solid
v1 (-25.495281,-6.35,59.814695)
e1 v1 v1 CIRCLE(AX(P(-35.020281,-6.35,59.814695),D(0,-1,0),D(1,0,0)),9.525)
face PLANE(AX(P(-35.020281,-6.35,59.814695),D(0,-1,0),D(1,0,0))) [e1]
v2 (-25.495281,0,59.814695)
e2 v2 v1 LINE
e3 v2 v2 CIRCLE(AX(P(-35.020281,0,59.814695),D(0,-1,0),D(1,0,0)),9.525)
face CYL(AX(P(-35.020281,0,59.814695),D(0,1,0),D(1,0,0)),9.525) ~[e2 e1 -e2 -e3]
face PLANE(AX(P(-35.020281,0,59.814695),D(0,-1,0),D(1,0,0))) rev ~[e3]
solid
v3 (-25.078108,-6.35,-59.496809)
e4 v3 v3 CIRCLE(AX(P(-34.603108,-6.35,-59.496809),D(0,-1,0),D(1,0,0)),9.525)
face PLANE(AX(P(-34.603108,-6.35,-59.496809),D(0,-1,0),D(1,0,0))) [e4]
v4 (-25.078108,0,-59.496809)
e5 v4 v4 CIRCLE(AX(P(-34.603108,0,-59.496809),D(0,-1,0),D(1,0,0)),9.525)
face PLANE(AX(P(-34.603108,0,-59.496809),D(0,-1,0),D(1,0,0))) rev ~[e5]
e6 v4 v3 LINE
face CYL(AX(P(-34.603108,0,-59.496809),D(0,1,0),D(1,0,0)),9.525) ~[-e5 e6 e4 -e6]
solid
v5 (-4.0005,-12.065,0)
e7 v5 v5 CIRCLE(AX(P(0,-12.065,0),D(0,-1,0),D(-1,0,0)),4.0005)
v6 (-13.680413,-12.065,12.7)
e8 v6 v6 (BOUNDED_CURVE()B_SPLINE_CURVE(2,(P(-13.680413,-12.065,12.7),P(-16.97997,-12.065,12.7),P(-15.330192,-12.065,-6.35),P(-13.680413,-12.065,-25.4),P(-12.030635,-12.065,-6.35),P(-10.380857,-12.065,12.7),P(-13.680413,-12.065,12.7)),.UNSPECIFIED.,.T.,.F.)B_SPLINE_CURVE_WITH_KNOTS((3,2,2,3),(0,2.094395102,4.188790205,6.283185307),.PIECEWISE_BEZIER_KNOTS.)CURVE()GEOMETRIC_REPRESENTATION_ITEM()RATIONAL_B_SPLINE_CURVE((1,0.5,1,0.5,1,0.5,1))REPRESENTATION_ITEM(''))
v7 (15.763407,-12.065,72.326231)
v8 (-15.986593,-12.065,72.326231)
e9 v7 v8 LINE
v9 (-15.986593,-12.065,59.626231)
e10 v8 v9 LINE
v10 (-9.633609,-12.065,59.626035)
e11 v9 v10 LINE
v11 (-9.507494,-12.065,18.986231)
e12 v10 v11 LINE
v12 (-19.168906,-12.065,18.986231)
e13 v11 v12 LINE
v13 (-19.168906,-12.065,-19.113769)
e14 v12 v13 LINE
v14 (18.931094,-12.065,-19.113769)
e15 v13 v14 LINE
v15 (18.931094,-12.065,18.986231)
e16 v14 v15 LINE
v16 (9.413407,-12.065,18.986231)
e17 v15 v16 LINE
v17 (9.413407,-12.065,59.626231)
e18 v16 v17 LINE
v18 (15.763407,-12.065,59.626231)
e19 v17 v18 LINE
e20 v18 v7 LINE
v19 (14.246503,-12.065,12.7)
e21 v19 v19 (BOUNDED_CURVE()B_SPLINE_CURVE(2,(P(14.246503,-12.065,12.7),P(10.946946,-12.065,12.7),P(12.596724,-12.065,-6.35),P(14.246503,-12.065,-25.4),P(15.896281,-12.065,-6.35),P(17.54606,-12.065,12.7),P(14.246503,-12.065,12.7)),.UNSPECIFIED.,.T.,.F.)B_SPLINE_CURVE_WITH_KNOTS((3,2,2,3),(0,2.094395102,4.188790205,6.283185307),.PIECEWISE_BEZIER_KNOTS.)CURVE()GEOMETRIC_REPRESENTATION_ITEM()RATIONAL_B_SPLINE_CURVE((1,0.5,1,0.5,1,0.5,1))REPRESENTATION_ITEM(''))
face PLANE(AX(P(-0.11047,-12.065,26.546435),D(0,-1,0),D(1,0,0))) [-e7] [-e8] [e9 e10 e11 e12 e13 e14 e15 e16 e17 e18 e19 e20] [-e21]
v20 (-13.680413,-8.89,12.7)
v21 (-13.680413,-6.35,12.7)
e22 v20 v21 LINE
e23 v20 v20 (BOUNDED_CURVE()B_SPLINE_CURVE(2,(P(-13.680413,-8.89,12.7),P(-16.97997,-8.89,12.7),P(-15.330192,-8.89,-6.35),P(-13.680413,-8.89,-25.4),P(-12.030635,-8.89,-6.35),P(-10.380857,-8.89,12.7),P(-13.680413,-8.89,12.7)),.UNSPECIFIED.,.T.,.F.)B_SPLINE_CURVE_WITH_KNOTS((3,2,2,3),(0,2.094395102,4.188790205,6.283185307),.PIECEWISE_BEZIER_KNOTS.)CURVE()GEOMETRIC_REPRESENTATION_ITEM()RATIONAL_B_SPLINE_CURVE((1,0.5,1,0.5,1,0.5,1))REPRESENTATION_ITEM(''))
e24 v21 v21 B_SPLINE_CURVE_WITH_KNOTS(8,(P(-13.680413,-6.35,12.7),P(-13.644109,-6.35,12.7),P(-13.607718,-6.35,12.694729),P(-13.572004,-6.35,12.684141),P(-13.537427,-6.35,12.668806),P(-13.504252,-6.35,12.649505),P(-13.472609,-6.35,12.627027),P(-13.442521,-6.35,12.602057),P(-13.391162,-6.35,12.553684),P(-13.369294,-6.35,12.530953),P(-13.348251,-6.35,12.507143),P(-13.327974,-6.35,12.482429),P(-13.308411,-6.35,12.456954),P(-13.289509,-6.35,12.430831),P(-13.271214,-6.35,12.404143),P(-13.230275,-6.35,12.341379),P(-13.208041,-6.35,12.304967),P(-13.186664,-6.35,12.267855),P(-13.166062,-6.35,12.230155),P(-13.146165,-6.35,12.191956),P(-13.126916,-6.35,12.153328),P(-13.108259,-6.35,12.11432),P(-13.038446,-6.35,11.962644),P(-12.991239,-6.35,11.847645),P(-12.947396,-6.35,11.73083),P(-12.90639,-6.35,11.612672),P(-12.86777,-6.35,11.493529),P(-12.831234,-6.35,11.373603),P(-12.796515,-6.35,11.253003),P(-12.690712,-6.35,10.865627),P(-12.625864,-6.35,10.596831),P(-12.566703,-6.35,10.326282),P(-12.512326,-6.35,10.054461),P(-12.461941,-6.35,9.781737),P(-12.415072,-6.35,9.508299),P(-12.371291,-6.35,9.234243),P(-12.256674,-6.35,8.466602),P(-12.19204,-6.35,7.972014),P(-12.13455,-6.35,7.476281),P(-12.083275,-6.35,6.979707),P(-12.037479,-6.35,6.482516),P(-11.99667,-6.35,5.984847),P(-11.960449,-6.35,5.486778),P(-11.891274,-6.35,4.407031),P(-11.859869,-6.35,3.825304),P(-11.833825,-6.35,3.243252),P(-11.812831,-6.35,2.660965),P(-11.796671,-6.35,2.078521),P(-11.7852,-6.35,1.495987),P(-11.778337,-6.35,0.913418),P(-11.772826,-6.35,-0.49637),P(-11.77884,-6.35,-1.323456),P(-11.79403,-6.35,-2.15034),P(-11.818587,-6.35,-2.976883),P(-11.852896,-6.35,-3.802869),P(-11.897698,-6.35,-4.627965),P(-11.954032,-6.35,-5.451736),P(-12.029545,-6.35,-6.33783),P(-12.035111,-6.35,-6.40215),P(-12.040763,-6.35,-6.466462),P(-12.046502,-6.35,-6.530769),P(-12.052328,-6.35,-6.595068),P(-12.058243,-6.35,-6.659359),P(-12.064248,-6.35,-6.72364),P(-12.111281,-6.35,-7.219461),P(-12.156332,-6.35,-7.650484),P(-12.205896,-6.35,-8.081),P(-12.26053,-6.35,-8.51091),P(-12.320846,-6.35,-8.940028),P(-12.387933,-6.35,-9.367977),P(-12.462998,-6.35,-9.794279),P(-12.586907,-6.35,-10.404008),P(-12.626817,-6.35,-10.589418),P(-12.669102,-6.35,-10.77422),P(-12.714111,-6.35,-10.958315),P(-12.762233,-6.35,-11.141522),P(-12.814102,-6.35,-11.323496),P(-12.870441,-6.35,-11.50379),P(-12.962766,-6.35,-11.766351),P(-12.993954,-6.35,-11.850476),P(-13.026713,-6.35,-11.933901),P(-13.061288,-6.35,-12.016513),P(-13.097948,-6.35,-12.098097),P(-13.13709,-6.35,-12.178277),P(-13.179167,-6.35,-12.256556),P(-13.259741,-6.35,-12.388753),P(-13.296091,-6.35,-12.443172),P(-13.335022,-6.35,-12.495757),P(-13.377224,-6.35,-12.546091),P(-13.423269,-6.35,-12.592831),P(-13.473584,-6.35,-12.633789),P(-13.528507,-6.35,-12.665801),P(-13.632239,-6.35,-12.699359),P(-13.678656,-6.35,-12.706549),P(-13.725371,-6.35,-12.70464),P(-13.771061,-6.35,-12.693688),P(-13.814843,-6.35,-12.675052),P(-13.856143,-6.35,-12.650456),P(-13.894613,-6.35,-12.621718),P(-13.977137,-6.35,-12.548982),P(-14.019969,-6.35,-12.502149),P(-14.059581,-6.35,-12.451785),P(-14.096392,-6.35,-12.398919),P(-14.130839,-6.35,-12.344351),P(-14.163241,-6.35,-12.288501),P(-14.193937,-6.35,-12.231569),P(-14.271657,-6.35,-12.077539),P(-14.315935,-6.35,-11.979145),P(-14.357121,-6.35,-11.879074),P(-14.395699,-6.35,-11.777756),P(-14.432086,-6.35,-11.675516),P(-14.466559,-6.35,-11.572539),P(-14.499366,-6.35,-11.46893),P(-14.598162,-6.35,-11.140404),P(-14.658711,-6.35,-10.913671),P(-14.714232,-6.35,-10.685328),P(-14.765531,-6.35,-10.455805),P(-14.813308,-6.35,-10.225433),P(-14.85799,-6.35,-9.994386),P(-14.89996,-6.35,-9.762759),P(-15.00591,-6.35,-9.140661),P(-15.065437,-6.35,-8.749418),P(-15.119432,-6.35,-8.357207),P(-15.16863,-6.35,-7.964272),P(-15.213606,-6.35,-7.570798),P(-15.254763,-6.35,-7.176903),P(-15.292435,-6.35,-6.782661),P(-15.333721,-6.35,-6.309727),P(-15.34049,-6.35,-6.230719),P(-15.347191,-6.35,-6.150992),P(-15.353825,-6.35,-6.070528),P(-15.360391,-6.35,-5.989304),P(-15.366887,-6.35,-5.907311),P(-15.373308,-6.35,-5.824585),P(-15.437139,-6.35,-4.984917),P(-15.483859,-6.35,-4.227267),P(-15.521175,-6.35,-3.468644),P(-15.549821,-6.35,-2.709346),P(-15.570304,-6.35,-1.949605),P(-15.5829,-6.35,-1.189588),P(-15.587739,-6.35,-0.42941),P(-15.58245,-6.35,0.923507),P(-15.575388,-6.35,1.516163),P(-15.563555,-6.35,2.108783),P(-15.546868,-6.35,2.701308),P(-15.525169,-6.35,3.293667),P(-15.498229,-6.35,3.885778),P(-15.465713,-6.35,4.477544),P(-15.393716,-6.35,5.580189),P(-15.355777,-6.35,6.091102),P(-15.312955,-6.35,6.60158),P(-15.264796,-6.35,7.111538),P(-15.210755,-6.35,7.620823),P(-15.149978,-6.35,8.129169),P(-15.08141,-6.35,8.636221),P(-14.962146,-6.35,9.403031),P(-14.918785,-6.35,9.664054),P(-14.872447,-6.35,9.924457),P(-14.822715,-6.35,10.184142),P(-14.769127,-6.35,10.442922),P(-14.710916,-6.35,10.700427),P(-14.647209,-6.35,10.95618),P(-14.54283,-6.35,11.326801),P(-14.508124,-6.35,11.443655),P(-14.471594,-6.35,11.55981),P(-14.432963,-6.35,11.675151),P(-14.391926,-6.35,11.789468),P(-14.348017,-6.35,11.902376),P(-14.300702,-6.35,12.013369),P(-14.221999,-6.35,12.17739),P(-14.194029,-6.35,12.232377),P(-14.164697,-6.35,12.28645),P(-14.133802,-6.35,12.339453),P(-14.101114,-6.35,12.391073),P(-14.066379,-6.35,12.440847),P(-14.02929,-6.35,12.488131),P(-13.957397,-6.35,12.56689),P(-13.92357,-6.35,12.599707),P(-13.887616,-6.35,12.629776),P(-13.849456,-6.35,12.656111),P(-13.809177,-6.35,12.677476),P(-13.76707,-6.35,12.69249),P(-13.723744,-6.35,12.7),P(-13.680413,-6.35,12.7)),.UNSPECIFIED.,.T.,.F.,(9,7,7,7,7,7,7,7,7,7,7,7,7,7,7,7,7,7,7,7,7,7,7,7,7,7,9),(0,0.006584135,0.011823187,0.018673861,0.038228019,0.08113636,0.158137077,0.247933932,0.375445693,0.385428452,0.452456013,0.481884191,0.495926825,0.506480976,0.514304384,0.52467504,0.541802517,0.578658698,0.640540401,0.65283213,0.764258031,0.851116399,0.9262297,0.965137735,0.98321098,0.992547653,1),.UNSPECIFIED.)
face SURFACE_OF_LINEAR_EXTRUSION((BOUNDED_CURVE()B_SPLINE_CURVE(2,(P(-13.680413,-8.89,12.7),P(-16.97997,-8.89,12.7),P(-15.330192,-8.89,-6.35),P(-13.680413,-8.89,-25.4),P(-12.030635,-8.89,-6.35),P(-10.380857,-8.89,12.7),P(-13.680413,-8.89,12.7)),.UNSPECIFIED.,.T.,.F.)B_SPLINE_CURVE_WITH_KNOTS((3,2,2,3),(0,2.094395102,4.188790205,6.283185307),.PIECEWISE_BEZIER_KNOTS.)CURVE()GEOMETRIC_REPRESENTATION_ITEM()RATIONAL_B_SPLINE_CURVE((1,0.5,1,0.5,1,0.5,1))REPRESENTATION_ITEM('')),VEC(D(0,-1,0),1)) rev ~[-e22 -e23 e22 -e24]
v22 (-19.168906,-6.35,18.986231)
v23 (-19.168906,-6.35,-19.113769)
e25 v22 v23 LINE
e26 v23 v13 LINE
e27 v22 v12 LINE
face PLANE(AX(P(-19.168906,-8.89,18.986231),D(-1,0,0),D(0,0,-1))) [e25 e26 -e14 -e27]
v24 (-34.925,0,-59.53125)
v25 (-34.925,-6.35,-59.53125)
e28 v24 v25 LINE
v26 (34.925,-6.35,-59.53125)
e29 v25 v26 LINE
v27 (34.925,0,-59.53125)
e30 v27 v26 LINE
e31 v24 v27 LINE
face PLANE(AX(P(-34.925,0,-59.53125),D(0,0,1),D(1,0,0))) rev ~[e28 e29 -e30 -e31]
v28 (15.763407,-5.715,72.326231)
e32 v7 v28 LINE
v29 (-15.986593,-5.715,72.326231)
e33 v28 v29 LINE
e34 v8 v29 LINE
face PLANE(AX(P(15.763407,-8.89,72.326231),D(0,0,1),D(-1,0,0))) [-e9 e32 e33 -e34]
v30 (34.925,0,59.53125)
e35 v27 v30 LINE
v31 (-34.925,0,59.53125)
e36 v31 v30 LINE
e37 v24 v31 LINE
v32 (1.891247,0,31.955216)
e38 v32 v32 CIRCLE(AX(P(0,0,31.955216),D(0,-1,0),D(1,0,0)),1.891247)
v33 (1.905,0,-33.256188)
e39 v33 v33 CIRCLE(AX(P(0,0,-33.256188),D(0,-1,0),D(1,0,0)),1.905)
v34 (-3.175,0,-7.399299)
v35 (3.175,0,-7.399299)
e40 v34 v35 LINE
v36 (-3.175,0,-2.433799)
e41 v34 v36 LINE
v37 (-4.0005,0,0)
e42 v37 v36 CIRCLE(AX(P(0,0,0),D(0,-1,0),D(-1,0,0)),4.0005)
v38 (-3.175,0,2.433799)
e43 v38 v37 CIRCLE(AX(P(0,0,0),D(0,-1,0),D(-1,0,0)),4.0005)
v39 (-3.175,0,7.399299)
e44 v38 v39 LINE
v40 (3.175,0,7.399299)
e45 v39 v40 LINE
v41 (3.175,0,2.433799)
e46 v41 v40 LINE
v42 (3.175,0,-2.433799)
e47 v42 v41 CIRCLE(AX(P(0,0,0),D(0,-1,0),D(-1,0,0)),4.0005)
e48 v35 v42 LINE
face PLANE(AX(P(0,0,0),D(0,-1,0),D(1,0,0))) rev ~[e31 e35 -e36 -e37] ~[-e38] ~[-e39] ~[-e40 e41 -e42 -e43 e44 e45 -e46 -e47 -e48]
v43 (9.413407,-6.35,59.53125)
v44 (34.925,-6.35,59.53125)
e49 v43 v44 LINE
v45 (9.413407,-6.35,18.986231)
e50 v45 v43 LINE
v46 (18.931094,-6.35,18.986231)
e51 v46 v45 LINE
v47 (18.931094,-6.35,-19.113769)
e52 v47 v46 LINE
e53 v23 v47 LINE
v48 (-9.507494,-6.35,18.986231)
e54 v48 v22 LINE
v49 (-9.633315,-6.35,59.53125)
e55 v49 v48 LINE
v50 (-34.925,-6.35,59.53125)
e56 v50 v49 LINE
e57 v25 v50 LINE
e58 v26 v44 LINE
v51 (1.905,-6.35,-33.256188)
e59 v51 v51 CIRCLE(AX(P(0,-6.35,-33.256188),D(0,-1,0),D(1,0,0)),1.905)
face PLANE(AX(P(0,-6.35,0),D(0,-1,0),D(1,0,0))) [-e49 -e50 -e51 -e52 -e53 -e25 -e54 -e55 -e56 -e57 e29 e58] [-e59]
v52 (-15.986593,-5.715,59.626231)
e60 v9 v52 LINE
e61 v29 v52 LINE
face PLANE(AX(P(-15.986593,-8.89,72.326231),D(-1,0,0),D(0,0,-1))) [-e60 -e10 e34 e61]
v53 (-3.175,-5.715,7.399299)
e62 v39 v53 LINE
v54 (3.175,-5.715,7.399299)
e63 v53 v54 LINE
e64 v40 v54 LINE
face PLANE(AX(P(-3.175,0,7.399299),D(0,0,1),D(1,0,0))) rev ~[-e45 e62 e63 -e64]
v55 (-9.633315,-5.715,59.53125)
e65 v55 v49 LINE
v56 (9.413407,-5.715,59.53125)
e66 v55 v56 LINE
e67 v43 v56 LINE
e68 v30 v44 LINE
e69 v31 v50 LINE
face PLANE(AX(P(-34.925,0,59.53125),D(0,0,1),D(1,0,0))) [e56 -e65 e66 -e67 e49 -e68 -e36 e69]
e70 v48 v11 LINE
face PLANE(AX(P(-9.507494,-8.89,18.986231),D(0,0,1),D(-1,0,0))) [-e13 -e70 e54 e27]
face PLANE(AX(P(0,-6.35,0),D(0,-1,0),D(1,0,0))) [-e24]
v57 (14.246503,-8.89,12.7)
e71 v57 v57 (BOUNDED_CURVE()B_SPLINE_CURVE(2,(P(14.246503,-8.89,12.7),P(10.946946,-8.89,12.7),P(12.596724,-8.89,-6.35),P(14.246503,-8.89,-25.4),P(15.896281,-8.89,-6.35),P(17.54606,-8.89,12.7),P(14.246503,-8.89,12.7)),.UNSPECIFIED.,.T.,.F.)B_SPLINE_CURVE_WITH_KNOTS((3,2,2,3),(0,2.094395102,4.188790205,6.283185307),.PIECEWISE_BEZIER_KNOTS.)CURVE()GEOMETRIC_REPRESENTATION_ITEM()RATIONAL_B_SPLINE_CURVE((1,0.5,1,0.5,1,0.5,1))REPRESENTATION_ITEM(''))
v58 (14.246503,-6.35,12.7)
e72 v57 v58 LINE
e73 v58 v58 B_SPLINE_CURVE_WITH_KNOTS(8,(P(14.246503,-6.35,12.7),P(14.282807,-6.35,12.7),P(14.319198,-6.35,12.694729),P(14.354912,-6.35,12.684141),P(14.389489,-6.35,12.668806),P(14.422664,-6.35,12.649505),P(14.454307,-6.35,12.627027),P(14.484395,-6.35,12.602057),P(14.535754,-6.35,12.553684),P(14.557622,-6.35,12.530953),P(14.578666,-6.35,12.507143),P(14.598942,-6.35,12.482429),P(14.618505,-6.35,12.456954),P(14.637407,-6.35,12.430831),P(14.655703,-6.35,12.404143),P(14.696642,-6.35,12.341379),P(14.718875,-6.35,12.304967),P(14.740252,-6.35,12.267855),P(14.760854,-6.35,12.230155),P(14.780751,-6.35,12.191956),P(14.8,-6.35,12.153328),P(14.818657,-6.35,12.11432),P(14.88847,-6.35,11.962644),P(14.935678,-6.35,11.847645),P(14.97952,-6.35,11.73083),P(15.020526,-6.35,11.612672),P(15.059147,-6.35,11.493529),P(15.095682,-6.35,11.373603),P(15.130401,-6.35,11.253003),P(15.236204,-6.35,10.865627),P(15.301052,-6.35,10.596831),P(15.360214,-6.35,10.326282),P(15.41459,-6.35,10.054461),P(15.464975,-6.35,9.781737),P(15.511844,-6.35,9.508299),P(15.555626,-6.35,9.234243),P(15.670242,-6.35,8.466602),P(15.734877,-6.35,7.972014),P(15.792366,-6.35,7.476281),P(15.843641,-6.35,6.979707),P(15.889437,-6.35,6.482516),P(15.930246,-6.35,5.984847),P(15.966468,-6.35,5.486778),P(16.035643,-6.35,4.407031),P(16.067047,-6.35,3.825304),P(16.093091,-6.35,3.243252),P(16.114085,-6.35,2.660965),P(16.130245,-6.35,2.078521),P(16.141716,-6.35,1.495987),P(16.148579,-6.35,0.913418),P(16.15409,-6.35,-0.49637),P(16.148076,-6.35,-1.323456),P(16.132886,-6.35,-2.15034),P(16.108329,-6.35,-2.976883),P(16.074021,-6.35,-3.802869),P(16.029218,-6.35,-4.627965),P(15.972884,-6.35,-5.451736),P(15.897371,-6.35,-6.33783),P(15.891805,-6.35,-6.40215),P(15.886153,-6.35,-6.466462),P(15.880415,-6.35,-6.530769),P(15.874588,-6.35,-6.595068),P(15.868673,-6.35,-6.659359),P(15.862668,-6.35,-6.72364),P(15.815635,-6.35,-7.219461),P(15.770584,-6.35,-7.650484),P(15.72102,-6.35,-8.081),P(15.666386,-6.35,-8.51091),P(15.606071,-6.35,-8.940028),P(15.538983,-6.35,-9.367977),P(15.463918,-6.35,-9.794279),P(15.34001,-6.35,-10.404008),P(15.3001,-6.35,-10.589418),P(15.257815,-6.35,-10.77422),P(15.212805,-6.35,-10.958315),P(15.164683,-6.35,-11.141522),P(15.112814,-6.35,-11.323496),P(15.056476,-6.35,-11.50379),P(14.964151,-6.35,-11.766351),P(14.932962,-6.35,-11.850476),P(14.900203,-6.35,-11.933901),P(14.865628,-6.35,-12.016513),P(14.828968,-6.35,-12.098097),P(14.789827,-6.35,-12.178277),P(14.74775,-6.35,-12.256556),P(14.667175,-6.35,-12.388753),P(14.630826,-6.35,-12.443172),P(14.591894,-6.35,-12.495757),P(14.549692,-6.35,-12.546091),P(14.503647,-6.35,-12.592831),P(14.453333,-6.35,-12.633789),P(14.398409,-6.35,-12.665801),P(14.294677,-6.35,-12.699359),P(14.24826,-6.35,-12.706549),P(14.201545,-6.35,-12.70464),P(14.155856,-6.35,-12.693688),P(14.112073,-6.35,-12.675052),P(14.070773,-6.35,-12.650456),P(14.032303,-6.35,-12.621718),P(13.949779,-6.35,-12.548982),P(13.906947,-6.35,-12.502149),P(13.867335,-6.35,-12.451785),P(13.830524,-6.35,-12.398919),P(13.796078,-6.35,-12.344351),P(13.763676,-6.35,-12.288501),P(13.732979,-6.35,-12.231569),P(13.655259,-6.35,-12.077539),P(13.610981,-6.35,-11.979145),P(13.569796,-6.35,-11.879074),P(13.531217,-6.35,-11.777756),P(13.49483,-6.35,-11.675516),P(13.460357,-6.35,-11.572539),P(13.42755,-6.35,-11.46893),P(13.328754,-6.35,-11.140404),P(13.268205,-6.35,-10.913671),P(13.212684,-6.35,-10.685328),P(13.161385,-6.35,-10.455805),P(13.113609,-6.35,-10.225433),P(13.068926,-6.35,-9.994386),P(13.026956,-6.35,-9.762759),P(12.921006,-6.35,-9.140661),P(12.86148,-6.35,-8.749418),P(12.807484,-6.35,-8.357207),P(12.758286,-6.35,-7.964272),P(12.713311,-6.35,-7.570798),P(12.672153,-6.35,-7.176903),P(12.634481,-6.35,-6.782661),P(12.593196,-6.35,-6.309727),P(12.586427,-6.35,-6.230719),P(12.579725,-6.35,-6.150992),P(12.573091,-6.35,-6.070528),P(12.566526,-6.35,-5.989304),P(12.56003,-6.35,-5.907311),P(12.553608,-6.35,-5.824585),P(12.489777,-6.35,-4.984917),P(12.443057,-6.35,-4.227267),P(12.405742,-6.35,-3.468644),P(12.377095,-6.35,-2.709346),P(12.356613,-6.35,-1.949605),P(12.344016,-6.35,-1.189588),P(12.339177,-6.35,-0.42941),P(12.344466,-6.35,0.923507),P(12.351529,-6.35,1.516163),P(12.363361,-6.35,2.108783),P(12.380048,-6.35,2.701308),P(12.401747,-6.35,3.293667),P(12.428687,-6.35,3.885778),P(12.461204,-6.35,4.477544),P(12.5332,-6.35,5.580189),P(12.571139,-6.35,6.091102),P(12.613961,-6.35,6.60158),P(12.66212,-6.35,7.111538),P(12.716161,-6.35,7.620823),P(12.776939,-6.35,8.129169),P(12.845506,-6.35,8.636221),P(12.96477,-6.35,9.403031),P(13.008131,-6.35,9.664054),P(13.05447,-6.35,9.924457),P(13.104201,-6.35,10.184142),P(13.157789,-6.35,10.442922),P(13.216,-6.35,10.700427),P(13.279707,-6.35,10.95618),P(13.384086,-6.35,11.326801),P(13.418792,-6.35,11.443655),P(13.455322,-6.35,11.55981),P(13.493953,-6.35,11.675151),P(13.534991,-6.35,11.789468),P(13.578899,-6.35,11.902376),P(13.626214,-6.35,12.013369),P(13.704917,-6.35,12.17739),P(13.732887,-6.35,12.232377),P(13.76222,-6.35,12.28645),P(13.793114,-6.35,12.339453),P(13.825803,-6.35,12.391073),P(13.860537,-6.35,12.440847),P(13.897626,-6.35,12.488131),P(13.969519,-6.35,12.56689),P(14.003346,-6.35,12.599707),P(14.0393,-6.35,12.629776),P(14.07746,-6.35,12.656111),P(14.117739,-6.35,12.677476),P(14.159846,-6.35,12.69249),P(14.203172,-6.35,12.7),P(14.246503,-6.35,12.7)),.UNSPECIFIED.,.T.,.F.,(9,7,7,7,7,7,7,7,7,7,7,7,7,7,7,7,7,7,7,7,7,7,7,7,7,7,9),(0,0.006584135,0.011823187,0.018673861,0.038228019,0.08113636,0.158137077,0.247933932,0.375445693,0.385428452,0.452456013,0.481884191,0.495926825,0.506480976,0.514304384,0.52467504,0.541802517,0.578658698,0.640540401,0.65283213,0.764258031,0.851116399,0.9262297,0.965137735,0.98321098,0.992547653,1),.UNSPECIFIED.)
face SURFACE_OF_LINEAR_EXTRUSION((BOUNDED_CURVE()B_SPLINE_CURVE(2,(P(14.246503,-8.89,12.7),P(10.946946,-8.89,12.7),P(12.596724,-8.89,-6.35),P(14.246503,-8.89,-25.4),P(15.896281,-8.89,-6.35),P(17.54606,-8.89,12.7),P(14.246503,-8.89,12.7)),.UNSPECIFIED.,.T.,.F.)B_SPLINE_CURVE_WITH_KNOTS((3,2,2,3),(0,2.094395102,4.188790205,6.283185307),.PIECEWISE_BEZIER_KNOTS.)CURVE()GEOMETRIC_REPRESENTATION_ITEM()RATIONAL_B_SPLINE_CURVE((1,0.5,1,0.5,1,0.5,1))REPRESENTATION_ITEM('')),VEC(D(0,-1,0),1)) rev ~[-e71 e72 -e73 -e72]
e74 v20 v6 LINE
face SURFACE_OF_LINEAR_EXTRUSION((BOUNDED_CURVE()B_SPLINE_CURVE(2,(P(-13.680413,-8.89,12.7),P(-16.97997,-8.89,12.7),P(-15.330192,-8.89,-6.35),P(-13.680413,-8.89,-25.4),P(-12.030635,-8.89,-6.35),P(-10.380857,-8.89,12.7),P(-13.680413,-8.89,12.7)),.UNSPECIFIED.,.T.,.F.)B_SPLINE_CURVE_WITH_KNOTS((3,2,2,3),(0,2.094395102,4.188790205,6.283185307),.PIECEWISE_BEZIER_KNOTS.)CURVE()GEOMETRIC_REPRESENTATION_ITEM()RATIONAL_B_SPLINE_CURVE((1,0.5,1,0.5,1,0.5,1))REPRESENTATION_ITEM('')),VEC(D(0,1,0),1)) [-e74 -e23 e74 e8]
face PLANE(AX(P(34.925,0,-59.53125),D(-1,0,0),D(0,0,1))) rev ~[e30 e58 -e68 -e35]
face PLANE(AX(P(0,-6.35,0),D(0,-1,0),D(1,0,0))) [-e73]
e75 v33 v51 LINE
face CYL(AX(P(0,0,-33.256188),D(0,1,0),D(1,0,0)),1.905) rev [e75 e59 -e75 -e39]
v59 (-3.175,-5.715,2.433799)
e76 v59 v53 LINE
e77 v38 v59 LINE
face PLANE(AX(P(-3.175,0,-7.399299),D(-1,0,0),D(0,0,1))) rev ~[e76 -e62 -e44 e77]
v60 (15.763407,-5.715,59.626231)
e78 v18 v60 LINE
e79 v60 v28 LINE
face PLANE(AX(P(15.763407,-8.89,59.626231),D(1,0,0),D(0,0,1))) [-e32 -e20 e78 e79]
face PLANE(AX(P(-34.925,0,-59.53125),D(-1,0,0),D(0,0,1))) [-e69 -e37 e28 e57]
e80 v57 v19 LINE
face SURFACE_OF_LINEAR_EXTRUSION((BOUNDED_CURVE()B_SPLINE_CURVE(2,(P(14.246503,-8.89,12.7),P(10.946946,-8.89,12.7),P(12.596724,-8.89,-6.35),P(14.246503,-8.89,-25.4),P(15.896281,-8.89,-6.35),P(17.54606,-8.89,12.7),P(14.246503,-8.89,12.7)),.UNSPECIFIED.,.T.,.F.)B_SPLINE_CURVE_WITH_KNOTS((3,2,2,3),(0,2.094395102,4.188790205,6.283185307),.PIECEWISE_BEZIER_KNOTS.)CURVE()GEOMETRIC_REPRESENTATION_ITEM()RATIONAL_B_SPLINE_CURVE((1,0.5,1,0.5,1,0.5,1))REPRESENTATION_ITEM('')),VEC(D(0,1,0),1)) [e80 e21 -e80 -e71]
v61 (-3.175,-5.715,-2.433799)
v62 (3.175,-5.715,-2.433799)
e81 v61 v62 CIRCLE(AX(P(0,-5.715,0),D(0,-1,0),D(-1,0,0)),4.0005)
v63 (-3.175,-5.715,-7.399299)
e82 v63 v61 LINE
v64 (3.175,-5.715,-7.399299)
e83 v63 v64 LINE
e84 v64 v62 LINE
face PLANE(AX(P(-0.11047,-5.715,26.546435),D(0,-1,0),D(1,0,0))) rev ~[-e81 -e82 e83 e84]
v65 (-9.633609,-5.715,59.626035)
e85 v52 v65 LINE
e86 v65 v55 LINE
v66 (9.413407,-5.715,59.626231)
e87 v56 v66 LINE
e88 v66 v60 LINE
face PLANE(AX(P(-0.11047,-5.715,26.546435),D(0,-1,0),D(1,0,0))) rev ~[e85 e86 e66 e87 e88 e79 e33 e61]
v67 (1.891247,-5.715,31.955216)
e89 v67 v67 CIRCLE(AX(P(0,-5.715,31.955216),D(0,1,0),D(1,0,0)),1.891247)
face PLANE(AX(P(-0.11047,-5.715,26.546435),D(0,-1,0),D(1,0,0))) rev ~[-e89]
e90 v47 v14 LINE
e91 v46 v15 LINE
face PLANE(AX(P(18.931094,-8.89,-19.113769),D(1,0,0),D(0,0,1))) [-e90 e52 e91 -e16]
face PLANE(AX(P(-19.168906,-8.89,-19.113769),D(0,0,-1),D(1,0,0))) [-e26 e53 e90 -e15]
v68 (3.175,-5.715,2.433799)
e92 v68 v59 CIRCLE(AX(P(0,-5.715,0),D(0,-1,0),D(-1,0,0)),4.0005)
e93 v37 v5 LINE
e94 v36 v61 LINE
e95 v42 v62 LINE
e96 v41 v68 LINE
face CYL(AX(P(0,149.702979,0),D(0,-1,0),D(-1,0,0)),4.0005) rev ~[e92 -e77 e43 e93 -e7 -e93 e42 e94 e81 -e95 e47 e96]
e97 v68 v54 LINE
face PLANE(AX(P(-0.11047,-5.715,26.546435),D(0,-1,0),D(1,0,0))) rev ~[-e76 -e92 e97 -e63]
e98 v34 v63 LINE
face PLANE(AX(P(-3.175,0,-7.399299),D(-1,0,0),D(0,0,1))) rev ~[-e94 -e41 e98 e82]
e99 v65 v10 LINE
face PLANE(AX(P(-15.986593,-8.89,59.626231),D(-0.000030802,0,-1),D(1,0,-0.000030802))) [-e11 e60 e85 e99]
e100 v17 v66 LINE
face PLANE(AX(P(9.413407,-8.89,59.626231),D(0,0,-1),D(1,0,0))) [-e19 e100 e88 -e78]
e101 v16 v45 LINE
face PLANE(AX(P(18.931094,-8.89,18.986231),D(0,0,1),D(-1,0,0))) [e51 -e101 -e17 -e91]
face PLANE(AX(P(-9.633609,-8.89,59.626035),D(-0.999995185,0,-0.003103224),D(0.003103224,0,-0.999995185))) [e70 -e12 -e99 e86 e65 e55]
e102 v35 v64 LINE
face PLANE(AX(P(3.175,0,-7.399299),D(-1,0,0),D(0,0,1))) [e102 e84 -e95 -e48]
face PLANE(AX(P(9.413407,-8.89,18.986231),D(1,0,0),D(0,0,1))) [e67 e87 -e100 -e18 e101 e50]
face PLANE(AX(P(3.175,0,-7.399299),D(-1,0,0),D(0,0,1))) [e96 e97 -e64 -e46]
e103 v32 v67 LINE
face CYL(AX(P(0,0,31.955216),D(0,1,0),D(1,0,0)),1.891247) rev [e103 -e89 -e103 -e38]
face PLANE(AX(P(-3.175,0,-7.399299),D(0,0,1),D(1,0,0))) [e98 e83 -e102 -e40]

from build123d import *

# Parameters (mm, degrees)
F2_R     = 9.525
F3_DEPTH = 6.35
F0_W     = 69.85
F0_H     = 119.0625
F0_R     = 1.905
F0_W_2   = 6.35
F0_H_2   = 14.798598364
F0_R_2   = 1.8912469653
F1_R     = 9.525
F6_DEPTH = 3.175
F7_D     = 8.001


with BuildPart() as f3:
    # F2 (on Front) → F3 (new body)
    with BuildSketch(Plane.XZ):
        with Locations((-34.6031077206, -59.4968087971)):
            Circle(F2_R)
    extrude(amount=F3_DEPTH)


with BuildPart() as f3b:
    # F0 (on Front) → F3, piece 2 (new body)
    with BuildSketch(Plane.XZ):
        Rectangle(F0_W, F0_H)
        with Locations((0, -33.256188035)):
            Circle(F0_R, mode=Mode.SUBTRACT)
        Rectangle(F0_W_2, F0_H_2, mode=Mode.SUBTRACT)
        with Locations((0, 31.95521608)):
            Circle(F0_R_2, mode=Mode.SUBTRACT)
    extrude(amount=F3_DEPTH)

    # F5 (on face) → F6 (join, symmetric)
    with BuildSketch(Plane.XZ.offset(8.89)):
        Polygon((-15.9865934402, 59.6262310743), (-9.6336090937, 59.6260353923), (-9.5074940844, 18.9862310743), (-19.1689059138, 18.9862310743), (-19.1689059138, -19.1137689257), (18.9310940862, -19.1137689257), (18.9310940862, 18.9862310743), (9.4134065598, 18.9862310743), (9.4134065598, 59.6262310743), (15.7634065598, 59.6262310743), (15.7634065598, 72.3262310743), (-15.9865934402, 72.3262310743), align=None)
        with BuildLine():
            add(Edge.make_bspline(
                [(-13.6804133654, 12.7), (-16.9799701538, 12.7), (-15.3301917596, -6.35), (-13.6804133654, -25.4), (-12.0306349712, -6.35), (-10.3808565769, 12.7), (-13.6804133654, 12.7)],
                knots=[0, 0, 0, 2.0943951024, 2.0943951024, 4.1887902048, 4.1887902048, 6.2831853072, 6.2831853072, 6.2831853072], degree=2, weights=[1, 0.5, 1, 0.5, 1, 0.5, 1]))
        make_face(mode=Mode.SUBTRACT)
        with BuildLine():
            add(Edge.make_bspline(
                [(14.2465028912, 12.7), (10.9469461028, 12.7), (12.596724497, -6.35), (14.2465028912, -25.4), (15.8962812854, -6.35), (17.5460596796, 12.7), (14.2465028912, 12.7)],
                knots=[0, 0, 0, 2.0943951024, 2.0943951024, 4.1887902048, 4.1887902048, 6.2831853072, 6.2831853072, 6.2831853072], degree=2, weights=[1, 0.5, 1, 0.5, 1, 0.5, 1]))
        make_face(mode=Mode.SUBTRACT)
    extrude(amount=F6_DEPTH, both=True)

    # F7 (through all)
    with Locations(Plane(origin=(0, 0, 0), x_dir=(1, 0, 0), z_dir=(0, 1, 0))):
        with Locations((0, 0)):
            Hole(F7_D / 2)


with BuildPart() as f3c:
    # F1 (on Front) → F3, piece 3 (new body)
    with BuildSketch(Plane.XZ):
        with Locations((-35.0202806294, 59.8146952689)):
            Circle(F1_R)
    extrude(amount=F3_DEPTH)


solid = Compound([f3.part, f3b.part, f3c.part])
